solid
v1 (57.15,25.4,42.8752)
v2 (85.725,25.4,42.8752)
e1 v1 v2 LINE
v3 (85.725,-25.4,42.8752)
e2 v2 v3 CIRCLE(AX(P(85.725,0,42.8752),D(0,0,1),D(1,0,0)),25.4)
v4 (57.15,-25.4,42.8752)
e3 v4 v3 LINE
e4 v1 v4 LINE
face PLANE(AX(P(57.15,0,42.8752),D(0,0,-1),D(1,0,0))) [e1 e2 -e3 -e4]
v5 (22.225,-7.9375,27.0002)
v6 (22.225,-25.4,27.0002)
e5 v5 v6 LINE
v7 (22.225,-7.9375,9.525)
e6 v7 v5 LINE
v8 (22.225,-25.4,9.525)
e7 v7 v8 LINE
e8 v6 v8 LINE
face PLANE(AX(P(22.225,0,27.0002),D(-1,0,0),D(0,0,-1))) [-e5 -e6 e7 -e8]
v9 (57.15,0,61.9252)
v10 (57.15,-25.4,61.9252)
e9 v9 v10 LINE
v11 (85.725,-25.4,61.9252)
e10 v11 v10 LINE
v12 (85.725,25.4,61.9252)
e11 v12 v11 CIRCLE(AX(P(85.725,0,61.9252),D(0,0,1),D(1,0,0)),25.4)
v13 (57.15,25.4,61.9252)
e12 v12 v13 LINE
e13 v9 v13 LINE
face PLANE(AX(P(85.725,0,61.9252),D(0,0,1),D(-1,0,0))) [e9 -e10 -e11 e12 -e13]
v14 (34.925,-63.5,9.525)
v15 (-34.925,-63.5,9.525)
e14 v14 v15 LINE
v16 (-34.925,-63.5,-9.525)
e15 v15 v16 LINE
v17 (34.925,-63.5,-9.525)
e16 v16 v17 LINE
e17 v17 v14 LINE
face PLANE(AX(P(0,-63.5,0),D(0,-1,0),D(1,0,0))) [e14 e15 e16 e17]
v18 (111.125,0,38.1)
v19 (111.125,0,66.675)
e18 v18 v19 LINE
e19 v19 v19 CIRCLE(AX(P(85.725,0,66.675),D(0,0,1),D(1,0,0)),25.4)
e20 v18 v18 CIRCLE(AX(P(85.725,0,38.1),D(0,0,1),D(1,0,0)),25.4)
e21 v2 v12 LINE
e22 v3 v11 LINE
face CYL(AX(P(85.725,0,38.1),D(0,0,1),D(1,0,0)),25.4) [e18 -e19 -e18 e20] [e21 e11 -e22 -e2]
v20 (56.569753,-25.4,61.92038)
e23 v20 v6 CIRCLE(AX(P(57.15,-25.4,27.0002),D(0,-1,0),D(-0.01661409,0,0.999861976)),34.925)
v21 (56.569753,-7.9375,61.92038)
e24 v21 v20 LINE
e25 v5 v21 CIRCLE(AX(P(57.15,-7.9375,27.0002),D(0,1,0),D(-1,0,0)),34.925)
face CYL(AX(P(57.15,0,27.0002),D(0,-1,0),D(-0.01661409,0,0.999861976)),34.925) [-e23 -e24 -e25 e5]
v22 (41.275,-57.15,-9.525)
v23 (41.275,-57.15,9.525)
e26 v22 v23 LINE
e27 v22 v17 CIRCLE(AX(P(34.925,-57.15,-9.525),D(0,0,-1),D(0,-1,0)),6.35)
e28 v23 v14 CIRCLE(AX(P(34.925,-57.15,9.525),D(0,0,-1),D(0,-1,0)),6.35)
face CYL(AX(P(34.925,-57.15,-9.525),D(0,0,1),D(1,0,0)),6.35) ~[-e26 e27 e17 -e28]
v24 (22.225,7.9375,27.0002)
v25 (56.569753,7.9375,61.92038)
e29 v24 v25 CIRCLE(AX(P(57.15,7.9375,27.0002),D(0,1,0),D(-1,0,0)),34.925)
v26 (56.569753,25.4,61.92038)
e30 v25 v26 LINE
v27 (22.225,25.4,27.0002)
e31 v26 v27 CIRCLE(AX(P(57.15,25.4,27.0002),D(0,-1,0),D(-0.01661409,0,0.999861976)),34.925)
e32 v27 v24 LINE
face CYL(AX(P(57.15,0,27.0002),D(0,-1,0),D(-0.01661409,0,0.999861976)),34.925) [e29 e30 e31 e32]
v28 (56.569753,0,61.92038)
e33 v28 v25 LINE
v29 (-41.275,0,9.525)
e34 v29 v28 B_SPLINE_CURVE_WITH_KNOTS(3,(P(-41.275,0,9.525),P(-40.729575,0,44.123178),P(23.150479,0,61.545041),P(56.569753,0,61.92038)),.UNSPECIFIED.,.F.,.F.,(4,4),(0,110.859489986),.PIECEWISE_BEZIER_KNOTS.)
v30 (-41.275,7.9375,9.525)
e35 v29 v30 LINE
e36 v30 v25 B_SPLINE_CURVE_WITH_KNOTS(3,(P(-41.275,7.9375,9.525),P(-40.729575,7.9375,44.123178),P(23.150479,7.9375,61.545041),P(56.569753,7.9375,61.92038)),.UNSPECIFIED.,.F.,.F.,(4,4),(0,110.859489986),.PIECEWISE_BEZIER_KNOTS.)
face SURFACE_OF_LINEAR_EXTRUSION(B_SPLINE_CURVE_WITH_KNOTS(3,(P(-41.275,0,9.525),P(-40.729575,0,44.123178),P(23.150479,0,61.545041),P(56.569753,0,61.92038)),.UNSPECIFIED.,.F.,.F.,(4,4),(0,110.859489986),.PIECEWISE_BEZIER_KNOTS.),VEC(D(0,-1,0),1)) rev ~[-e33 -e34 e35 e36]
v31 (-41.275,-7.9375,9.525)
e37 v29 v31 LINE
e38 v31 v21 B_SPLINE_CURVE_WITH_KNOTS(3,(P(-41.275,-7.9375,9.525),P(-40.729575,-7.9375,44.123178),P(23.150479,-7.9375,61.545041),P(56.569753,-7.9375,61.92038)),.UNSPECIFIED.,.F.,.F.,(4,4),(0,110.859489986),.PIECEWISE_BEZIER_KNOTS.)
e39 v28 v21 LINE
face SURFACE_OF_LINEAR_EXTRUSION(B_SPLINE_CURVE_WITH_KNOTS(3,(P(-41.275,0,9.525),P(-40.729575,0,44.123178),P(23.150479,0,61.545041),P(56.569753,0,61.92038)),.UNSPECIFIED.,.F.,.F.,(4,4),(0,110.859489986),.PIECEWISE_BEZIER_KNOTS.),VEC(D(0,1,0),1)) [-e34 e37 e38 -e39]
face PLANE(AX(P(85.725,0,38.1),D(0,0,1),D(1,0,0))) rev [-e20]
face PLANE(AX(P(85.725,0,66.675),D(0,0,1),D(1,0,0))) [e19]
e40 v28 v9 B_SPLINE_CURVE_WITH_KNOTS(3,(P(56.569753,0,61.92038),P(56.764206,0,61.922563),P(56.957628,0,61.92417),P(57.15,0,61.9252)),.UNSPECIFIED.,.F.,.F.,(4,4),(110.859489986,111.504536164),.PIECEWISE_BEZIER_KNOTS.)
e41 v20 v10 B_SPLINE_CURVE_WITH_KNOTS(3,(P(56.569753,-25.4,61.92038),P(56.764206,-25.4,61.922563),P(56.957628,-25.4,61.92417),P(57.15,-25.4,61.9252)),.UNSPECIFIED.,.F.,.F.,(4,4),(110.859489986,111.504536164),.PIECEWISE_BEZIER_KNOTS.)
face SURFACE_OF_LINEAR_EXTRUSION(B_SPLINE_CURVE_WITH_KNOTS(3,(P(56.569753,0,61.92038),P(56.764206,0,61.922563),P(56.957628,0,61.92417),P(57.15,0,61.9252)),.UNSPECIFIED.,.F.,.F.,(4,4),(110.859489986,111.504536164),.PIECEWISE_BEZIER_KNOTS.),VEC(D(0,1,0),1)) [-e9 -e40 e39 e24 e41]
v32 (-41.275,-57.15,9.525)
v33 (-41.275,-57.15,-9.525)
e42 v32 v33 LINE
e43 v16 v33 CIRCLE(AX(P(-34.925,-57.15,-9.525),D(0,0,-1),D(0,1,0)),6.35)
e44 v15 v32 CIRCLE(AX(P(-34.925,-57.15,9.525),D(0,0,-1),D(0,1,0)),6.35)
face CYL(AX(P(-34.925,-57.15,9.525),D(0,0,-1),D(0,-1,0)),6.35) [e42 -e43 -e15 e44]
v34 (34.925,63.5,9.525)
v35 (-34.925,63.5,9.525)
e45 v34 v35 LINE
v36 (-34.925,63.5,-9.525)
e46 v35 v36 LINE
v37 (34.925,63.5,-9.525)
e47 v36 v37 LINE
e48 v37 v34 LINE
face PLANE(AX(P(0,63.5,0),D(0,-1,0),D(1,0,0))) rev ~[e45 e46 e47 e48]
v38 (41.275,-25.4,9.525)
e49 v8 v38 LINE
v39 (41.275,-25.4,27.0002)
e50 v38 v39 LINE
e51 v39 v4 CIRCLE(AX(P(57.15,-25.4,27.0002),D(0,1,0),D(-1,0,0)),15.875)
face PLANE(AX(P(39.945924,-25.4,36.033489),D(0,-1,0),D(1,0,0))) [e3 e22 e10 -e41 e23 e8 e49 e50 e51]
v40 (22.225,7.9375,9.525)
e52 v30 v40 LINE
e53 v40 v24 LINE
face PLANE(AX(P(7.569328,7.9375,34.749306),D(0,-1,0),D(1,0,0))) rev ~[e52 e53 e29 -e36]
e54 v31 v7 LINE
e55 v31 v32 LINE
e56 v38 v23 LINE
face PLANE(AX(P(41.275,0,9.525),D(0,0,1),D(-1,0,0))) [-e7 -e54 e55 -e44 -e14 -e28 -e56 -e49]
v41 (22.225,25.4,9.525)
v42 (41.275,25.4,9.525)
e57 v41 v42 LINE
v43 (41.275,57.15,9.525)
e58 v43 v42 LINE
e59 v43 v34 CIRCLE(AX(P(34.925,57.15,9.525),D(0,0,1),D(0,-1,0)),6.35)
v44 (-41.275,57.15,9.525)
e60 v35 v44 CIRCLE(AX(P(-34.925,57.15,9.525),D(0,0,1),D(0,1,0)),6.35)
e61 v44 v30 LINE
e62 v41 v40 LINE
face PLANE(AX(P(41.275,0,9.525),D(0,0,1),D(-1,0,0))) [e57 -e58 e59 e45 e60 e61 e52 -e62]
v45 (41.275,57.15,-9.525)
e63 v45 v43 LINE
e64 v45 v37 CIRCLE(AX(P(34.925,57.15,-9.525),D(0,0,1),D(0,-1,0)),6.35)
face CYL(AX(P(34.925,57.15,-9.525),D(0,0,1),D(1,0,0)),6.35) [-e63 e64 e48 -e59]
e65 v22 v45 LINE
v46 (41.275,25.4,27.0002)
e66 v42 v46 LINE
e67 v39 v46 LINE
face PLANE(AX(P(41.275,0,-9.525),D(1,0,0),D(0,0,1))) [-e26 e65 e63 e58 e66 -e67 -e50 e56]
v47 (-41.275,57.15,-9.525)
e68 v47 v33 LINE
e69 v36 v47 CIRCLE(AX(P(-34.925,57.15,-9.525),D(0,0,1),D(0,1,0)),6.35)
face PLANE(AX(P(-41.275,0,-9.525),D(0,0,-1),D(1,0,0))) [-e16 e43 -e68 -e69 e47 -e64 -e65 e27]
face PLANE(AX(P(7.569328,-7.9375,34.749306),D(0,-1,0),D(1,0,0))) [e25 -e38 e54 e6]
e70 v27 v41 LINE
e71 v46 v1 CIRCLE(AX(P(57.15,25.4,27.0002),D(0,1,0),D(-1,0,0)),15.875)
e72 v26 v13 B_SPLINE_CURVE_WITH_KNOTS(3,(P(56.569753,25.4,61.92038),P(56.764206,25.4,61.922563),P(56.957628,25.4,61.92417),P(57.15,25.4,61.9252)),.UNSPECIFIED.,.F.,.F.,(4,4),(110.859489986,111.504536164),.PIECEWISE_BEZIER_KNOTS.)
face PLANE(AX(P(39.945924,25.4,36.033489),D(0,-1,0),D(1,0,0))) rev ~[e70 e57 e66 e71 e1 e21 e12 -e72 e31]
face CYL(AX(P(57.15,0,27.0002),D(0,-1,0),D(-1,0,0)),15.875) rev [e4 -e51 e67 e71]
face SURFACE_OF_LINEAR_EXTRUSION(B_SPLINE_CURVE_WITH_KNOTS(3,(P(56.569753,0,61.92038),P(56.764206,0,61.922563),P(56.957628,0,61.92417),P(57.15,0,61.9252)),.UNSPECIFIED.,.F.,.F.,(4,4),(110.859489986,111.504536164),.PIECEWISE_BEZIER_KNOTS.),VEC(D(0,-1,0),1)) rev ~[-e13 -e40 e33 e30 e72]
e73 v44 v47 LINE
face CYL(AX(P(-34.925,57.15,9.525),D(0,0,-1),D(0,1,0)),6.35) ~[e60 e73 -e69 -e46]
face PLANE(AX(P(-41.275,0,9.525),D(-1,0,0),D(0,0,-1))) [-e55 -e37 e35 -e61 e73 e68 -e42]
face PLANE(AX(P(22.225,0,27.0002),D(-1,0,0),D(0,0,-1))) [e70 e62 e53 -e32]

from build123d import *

# Parameters (mm, degrees)
F1_DEPTH = 63.5
F0_W     = 25.4
F0_H     = 19.05
F2_DEPTH = 25.4
F3_DEPTH = 7.9375
F5_R     = 6.35


with BuildPart() as f1:
    # F0 (on Front) → F1 (new body, symmetric)
    with BuildSketch(Plane.XZ):
        Polygon((41.275, -9.525), (41.275, 9.525), (22.225, 9.525), (-41.275, 9.525), (-41.275, -9.525), align=None)
    extrude(amount=F1_DEPTH, both=True)

    # F0 (on Front) → F2 (join, symmetric)
    with BuildSketch(Plane.XZ):
        with BuildLine():
            Line((22.225, 9.525), (41.275, 9.525))
            Line((41.275, 9.525), (41.275, 27.0002))
            ThreePointArc((41.275, 27.0002), (45.9246798487, 38.2255201513), (57.15, 42.8752))
            Line((57.15, 42.8752), (60.325, 42.8752))
            Line((60.325, 42.8752), (60.325, 61.9252))
            Line((60.325, 61.9252), (57.15, 61.9252))
            add(Edge.make_bspline(
                [(56.5697529207, 61.9203795288), (56.7642060535, 61.9225634714), (56.9576279056, 61.9241702866), (57.15, 61.9252)],
                knots=[110.8594899862, 110.8594899862, 110.8594899862, 110.8594899862, 111.5045361635, 111.5045361635, 111.5045361635, 111.5045361635], degree=3))
            ThreePointArc((56.5697529207, 61.9203795288), (32.2499924273, 51.4898967698), (22.225, 27.0002))
            Line((22.225, 27.0002), (22.225, 9.525))
        make_face()
        Polygon((41.275, -9.525), (41.275, 9.525), (22.225, 9.525), (-41.275, 9.525), (-41.275, -9.525), align=None)
        with Locations((73.025, 52.4002)):
            Rectangle(F0_W, F0_H)
    extrude(amount=F2_DEPTH, both=True)

    # F0 (on Front) → F3 (join, symmetric)
    with BuildSketch(Plane.XZ):
        with BuildLine():
            Line((-41.275, 9.525), (22.225, 9.525))
            Line((22.225, 9.525), (22.225, 27.0002))
            ThreePointArc((22.225, 27.0002), (32.2499924273, 51.4898967698), (56.5697529207, 61.9203795288))
            add(Edge.make_bspline(
                [(-41.275, 9.525), (-40.7295745203, 44.1231784774), (23.1504786353, 61.5450408791), (56.5697529207, 61.9203795288)],
                knots=[0, 0, 0, 0, 110.8594899862, 110.8594899862, 110.8594899862, 110.8594899862], degree=3))
        make_face()
    extrude(amount=F3_DEPTH, both=True)

    # F0 (on Front) → F4 (revolve)
    with BuildSketch(Plane.XZ):
        Polygon((85.725, 61.9252), (85.725, 42.8752), (85.725, 38.1), (111.125, 38.1), (111.125, 66.675), (85.725, 66.675), align=None)
    revolve(axis=Axis((85.725, 0, 52.3875), (0, 0, 1)))

    # F5
    f5_edges = [f1.edges().sort_by_distance(p)[0] for p in [
        (-41.275, -63.5, 0),
        (41.275, -63.5, 0),
        (41.275, 63.5, 0),
        (-41.275, 63.5, 0),
    ]]
    fillet(f5_edges, radius=F5_R)


solid = f1.part
